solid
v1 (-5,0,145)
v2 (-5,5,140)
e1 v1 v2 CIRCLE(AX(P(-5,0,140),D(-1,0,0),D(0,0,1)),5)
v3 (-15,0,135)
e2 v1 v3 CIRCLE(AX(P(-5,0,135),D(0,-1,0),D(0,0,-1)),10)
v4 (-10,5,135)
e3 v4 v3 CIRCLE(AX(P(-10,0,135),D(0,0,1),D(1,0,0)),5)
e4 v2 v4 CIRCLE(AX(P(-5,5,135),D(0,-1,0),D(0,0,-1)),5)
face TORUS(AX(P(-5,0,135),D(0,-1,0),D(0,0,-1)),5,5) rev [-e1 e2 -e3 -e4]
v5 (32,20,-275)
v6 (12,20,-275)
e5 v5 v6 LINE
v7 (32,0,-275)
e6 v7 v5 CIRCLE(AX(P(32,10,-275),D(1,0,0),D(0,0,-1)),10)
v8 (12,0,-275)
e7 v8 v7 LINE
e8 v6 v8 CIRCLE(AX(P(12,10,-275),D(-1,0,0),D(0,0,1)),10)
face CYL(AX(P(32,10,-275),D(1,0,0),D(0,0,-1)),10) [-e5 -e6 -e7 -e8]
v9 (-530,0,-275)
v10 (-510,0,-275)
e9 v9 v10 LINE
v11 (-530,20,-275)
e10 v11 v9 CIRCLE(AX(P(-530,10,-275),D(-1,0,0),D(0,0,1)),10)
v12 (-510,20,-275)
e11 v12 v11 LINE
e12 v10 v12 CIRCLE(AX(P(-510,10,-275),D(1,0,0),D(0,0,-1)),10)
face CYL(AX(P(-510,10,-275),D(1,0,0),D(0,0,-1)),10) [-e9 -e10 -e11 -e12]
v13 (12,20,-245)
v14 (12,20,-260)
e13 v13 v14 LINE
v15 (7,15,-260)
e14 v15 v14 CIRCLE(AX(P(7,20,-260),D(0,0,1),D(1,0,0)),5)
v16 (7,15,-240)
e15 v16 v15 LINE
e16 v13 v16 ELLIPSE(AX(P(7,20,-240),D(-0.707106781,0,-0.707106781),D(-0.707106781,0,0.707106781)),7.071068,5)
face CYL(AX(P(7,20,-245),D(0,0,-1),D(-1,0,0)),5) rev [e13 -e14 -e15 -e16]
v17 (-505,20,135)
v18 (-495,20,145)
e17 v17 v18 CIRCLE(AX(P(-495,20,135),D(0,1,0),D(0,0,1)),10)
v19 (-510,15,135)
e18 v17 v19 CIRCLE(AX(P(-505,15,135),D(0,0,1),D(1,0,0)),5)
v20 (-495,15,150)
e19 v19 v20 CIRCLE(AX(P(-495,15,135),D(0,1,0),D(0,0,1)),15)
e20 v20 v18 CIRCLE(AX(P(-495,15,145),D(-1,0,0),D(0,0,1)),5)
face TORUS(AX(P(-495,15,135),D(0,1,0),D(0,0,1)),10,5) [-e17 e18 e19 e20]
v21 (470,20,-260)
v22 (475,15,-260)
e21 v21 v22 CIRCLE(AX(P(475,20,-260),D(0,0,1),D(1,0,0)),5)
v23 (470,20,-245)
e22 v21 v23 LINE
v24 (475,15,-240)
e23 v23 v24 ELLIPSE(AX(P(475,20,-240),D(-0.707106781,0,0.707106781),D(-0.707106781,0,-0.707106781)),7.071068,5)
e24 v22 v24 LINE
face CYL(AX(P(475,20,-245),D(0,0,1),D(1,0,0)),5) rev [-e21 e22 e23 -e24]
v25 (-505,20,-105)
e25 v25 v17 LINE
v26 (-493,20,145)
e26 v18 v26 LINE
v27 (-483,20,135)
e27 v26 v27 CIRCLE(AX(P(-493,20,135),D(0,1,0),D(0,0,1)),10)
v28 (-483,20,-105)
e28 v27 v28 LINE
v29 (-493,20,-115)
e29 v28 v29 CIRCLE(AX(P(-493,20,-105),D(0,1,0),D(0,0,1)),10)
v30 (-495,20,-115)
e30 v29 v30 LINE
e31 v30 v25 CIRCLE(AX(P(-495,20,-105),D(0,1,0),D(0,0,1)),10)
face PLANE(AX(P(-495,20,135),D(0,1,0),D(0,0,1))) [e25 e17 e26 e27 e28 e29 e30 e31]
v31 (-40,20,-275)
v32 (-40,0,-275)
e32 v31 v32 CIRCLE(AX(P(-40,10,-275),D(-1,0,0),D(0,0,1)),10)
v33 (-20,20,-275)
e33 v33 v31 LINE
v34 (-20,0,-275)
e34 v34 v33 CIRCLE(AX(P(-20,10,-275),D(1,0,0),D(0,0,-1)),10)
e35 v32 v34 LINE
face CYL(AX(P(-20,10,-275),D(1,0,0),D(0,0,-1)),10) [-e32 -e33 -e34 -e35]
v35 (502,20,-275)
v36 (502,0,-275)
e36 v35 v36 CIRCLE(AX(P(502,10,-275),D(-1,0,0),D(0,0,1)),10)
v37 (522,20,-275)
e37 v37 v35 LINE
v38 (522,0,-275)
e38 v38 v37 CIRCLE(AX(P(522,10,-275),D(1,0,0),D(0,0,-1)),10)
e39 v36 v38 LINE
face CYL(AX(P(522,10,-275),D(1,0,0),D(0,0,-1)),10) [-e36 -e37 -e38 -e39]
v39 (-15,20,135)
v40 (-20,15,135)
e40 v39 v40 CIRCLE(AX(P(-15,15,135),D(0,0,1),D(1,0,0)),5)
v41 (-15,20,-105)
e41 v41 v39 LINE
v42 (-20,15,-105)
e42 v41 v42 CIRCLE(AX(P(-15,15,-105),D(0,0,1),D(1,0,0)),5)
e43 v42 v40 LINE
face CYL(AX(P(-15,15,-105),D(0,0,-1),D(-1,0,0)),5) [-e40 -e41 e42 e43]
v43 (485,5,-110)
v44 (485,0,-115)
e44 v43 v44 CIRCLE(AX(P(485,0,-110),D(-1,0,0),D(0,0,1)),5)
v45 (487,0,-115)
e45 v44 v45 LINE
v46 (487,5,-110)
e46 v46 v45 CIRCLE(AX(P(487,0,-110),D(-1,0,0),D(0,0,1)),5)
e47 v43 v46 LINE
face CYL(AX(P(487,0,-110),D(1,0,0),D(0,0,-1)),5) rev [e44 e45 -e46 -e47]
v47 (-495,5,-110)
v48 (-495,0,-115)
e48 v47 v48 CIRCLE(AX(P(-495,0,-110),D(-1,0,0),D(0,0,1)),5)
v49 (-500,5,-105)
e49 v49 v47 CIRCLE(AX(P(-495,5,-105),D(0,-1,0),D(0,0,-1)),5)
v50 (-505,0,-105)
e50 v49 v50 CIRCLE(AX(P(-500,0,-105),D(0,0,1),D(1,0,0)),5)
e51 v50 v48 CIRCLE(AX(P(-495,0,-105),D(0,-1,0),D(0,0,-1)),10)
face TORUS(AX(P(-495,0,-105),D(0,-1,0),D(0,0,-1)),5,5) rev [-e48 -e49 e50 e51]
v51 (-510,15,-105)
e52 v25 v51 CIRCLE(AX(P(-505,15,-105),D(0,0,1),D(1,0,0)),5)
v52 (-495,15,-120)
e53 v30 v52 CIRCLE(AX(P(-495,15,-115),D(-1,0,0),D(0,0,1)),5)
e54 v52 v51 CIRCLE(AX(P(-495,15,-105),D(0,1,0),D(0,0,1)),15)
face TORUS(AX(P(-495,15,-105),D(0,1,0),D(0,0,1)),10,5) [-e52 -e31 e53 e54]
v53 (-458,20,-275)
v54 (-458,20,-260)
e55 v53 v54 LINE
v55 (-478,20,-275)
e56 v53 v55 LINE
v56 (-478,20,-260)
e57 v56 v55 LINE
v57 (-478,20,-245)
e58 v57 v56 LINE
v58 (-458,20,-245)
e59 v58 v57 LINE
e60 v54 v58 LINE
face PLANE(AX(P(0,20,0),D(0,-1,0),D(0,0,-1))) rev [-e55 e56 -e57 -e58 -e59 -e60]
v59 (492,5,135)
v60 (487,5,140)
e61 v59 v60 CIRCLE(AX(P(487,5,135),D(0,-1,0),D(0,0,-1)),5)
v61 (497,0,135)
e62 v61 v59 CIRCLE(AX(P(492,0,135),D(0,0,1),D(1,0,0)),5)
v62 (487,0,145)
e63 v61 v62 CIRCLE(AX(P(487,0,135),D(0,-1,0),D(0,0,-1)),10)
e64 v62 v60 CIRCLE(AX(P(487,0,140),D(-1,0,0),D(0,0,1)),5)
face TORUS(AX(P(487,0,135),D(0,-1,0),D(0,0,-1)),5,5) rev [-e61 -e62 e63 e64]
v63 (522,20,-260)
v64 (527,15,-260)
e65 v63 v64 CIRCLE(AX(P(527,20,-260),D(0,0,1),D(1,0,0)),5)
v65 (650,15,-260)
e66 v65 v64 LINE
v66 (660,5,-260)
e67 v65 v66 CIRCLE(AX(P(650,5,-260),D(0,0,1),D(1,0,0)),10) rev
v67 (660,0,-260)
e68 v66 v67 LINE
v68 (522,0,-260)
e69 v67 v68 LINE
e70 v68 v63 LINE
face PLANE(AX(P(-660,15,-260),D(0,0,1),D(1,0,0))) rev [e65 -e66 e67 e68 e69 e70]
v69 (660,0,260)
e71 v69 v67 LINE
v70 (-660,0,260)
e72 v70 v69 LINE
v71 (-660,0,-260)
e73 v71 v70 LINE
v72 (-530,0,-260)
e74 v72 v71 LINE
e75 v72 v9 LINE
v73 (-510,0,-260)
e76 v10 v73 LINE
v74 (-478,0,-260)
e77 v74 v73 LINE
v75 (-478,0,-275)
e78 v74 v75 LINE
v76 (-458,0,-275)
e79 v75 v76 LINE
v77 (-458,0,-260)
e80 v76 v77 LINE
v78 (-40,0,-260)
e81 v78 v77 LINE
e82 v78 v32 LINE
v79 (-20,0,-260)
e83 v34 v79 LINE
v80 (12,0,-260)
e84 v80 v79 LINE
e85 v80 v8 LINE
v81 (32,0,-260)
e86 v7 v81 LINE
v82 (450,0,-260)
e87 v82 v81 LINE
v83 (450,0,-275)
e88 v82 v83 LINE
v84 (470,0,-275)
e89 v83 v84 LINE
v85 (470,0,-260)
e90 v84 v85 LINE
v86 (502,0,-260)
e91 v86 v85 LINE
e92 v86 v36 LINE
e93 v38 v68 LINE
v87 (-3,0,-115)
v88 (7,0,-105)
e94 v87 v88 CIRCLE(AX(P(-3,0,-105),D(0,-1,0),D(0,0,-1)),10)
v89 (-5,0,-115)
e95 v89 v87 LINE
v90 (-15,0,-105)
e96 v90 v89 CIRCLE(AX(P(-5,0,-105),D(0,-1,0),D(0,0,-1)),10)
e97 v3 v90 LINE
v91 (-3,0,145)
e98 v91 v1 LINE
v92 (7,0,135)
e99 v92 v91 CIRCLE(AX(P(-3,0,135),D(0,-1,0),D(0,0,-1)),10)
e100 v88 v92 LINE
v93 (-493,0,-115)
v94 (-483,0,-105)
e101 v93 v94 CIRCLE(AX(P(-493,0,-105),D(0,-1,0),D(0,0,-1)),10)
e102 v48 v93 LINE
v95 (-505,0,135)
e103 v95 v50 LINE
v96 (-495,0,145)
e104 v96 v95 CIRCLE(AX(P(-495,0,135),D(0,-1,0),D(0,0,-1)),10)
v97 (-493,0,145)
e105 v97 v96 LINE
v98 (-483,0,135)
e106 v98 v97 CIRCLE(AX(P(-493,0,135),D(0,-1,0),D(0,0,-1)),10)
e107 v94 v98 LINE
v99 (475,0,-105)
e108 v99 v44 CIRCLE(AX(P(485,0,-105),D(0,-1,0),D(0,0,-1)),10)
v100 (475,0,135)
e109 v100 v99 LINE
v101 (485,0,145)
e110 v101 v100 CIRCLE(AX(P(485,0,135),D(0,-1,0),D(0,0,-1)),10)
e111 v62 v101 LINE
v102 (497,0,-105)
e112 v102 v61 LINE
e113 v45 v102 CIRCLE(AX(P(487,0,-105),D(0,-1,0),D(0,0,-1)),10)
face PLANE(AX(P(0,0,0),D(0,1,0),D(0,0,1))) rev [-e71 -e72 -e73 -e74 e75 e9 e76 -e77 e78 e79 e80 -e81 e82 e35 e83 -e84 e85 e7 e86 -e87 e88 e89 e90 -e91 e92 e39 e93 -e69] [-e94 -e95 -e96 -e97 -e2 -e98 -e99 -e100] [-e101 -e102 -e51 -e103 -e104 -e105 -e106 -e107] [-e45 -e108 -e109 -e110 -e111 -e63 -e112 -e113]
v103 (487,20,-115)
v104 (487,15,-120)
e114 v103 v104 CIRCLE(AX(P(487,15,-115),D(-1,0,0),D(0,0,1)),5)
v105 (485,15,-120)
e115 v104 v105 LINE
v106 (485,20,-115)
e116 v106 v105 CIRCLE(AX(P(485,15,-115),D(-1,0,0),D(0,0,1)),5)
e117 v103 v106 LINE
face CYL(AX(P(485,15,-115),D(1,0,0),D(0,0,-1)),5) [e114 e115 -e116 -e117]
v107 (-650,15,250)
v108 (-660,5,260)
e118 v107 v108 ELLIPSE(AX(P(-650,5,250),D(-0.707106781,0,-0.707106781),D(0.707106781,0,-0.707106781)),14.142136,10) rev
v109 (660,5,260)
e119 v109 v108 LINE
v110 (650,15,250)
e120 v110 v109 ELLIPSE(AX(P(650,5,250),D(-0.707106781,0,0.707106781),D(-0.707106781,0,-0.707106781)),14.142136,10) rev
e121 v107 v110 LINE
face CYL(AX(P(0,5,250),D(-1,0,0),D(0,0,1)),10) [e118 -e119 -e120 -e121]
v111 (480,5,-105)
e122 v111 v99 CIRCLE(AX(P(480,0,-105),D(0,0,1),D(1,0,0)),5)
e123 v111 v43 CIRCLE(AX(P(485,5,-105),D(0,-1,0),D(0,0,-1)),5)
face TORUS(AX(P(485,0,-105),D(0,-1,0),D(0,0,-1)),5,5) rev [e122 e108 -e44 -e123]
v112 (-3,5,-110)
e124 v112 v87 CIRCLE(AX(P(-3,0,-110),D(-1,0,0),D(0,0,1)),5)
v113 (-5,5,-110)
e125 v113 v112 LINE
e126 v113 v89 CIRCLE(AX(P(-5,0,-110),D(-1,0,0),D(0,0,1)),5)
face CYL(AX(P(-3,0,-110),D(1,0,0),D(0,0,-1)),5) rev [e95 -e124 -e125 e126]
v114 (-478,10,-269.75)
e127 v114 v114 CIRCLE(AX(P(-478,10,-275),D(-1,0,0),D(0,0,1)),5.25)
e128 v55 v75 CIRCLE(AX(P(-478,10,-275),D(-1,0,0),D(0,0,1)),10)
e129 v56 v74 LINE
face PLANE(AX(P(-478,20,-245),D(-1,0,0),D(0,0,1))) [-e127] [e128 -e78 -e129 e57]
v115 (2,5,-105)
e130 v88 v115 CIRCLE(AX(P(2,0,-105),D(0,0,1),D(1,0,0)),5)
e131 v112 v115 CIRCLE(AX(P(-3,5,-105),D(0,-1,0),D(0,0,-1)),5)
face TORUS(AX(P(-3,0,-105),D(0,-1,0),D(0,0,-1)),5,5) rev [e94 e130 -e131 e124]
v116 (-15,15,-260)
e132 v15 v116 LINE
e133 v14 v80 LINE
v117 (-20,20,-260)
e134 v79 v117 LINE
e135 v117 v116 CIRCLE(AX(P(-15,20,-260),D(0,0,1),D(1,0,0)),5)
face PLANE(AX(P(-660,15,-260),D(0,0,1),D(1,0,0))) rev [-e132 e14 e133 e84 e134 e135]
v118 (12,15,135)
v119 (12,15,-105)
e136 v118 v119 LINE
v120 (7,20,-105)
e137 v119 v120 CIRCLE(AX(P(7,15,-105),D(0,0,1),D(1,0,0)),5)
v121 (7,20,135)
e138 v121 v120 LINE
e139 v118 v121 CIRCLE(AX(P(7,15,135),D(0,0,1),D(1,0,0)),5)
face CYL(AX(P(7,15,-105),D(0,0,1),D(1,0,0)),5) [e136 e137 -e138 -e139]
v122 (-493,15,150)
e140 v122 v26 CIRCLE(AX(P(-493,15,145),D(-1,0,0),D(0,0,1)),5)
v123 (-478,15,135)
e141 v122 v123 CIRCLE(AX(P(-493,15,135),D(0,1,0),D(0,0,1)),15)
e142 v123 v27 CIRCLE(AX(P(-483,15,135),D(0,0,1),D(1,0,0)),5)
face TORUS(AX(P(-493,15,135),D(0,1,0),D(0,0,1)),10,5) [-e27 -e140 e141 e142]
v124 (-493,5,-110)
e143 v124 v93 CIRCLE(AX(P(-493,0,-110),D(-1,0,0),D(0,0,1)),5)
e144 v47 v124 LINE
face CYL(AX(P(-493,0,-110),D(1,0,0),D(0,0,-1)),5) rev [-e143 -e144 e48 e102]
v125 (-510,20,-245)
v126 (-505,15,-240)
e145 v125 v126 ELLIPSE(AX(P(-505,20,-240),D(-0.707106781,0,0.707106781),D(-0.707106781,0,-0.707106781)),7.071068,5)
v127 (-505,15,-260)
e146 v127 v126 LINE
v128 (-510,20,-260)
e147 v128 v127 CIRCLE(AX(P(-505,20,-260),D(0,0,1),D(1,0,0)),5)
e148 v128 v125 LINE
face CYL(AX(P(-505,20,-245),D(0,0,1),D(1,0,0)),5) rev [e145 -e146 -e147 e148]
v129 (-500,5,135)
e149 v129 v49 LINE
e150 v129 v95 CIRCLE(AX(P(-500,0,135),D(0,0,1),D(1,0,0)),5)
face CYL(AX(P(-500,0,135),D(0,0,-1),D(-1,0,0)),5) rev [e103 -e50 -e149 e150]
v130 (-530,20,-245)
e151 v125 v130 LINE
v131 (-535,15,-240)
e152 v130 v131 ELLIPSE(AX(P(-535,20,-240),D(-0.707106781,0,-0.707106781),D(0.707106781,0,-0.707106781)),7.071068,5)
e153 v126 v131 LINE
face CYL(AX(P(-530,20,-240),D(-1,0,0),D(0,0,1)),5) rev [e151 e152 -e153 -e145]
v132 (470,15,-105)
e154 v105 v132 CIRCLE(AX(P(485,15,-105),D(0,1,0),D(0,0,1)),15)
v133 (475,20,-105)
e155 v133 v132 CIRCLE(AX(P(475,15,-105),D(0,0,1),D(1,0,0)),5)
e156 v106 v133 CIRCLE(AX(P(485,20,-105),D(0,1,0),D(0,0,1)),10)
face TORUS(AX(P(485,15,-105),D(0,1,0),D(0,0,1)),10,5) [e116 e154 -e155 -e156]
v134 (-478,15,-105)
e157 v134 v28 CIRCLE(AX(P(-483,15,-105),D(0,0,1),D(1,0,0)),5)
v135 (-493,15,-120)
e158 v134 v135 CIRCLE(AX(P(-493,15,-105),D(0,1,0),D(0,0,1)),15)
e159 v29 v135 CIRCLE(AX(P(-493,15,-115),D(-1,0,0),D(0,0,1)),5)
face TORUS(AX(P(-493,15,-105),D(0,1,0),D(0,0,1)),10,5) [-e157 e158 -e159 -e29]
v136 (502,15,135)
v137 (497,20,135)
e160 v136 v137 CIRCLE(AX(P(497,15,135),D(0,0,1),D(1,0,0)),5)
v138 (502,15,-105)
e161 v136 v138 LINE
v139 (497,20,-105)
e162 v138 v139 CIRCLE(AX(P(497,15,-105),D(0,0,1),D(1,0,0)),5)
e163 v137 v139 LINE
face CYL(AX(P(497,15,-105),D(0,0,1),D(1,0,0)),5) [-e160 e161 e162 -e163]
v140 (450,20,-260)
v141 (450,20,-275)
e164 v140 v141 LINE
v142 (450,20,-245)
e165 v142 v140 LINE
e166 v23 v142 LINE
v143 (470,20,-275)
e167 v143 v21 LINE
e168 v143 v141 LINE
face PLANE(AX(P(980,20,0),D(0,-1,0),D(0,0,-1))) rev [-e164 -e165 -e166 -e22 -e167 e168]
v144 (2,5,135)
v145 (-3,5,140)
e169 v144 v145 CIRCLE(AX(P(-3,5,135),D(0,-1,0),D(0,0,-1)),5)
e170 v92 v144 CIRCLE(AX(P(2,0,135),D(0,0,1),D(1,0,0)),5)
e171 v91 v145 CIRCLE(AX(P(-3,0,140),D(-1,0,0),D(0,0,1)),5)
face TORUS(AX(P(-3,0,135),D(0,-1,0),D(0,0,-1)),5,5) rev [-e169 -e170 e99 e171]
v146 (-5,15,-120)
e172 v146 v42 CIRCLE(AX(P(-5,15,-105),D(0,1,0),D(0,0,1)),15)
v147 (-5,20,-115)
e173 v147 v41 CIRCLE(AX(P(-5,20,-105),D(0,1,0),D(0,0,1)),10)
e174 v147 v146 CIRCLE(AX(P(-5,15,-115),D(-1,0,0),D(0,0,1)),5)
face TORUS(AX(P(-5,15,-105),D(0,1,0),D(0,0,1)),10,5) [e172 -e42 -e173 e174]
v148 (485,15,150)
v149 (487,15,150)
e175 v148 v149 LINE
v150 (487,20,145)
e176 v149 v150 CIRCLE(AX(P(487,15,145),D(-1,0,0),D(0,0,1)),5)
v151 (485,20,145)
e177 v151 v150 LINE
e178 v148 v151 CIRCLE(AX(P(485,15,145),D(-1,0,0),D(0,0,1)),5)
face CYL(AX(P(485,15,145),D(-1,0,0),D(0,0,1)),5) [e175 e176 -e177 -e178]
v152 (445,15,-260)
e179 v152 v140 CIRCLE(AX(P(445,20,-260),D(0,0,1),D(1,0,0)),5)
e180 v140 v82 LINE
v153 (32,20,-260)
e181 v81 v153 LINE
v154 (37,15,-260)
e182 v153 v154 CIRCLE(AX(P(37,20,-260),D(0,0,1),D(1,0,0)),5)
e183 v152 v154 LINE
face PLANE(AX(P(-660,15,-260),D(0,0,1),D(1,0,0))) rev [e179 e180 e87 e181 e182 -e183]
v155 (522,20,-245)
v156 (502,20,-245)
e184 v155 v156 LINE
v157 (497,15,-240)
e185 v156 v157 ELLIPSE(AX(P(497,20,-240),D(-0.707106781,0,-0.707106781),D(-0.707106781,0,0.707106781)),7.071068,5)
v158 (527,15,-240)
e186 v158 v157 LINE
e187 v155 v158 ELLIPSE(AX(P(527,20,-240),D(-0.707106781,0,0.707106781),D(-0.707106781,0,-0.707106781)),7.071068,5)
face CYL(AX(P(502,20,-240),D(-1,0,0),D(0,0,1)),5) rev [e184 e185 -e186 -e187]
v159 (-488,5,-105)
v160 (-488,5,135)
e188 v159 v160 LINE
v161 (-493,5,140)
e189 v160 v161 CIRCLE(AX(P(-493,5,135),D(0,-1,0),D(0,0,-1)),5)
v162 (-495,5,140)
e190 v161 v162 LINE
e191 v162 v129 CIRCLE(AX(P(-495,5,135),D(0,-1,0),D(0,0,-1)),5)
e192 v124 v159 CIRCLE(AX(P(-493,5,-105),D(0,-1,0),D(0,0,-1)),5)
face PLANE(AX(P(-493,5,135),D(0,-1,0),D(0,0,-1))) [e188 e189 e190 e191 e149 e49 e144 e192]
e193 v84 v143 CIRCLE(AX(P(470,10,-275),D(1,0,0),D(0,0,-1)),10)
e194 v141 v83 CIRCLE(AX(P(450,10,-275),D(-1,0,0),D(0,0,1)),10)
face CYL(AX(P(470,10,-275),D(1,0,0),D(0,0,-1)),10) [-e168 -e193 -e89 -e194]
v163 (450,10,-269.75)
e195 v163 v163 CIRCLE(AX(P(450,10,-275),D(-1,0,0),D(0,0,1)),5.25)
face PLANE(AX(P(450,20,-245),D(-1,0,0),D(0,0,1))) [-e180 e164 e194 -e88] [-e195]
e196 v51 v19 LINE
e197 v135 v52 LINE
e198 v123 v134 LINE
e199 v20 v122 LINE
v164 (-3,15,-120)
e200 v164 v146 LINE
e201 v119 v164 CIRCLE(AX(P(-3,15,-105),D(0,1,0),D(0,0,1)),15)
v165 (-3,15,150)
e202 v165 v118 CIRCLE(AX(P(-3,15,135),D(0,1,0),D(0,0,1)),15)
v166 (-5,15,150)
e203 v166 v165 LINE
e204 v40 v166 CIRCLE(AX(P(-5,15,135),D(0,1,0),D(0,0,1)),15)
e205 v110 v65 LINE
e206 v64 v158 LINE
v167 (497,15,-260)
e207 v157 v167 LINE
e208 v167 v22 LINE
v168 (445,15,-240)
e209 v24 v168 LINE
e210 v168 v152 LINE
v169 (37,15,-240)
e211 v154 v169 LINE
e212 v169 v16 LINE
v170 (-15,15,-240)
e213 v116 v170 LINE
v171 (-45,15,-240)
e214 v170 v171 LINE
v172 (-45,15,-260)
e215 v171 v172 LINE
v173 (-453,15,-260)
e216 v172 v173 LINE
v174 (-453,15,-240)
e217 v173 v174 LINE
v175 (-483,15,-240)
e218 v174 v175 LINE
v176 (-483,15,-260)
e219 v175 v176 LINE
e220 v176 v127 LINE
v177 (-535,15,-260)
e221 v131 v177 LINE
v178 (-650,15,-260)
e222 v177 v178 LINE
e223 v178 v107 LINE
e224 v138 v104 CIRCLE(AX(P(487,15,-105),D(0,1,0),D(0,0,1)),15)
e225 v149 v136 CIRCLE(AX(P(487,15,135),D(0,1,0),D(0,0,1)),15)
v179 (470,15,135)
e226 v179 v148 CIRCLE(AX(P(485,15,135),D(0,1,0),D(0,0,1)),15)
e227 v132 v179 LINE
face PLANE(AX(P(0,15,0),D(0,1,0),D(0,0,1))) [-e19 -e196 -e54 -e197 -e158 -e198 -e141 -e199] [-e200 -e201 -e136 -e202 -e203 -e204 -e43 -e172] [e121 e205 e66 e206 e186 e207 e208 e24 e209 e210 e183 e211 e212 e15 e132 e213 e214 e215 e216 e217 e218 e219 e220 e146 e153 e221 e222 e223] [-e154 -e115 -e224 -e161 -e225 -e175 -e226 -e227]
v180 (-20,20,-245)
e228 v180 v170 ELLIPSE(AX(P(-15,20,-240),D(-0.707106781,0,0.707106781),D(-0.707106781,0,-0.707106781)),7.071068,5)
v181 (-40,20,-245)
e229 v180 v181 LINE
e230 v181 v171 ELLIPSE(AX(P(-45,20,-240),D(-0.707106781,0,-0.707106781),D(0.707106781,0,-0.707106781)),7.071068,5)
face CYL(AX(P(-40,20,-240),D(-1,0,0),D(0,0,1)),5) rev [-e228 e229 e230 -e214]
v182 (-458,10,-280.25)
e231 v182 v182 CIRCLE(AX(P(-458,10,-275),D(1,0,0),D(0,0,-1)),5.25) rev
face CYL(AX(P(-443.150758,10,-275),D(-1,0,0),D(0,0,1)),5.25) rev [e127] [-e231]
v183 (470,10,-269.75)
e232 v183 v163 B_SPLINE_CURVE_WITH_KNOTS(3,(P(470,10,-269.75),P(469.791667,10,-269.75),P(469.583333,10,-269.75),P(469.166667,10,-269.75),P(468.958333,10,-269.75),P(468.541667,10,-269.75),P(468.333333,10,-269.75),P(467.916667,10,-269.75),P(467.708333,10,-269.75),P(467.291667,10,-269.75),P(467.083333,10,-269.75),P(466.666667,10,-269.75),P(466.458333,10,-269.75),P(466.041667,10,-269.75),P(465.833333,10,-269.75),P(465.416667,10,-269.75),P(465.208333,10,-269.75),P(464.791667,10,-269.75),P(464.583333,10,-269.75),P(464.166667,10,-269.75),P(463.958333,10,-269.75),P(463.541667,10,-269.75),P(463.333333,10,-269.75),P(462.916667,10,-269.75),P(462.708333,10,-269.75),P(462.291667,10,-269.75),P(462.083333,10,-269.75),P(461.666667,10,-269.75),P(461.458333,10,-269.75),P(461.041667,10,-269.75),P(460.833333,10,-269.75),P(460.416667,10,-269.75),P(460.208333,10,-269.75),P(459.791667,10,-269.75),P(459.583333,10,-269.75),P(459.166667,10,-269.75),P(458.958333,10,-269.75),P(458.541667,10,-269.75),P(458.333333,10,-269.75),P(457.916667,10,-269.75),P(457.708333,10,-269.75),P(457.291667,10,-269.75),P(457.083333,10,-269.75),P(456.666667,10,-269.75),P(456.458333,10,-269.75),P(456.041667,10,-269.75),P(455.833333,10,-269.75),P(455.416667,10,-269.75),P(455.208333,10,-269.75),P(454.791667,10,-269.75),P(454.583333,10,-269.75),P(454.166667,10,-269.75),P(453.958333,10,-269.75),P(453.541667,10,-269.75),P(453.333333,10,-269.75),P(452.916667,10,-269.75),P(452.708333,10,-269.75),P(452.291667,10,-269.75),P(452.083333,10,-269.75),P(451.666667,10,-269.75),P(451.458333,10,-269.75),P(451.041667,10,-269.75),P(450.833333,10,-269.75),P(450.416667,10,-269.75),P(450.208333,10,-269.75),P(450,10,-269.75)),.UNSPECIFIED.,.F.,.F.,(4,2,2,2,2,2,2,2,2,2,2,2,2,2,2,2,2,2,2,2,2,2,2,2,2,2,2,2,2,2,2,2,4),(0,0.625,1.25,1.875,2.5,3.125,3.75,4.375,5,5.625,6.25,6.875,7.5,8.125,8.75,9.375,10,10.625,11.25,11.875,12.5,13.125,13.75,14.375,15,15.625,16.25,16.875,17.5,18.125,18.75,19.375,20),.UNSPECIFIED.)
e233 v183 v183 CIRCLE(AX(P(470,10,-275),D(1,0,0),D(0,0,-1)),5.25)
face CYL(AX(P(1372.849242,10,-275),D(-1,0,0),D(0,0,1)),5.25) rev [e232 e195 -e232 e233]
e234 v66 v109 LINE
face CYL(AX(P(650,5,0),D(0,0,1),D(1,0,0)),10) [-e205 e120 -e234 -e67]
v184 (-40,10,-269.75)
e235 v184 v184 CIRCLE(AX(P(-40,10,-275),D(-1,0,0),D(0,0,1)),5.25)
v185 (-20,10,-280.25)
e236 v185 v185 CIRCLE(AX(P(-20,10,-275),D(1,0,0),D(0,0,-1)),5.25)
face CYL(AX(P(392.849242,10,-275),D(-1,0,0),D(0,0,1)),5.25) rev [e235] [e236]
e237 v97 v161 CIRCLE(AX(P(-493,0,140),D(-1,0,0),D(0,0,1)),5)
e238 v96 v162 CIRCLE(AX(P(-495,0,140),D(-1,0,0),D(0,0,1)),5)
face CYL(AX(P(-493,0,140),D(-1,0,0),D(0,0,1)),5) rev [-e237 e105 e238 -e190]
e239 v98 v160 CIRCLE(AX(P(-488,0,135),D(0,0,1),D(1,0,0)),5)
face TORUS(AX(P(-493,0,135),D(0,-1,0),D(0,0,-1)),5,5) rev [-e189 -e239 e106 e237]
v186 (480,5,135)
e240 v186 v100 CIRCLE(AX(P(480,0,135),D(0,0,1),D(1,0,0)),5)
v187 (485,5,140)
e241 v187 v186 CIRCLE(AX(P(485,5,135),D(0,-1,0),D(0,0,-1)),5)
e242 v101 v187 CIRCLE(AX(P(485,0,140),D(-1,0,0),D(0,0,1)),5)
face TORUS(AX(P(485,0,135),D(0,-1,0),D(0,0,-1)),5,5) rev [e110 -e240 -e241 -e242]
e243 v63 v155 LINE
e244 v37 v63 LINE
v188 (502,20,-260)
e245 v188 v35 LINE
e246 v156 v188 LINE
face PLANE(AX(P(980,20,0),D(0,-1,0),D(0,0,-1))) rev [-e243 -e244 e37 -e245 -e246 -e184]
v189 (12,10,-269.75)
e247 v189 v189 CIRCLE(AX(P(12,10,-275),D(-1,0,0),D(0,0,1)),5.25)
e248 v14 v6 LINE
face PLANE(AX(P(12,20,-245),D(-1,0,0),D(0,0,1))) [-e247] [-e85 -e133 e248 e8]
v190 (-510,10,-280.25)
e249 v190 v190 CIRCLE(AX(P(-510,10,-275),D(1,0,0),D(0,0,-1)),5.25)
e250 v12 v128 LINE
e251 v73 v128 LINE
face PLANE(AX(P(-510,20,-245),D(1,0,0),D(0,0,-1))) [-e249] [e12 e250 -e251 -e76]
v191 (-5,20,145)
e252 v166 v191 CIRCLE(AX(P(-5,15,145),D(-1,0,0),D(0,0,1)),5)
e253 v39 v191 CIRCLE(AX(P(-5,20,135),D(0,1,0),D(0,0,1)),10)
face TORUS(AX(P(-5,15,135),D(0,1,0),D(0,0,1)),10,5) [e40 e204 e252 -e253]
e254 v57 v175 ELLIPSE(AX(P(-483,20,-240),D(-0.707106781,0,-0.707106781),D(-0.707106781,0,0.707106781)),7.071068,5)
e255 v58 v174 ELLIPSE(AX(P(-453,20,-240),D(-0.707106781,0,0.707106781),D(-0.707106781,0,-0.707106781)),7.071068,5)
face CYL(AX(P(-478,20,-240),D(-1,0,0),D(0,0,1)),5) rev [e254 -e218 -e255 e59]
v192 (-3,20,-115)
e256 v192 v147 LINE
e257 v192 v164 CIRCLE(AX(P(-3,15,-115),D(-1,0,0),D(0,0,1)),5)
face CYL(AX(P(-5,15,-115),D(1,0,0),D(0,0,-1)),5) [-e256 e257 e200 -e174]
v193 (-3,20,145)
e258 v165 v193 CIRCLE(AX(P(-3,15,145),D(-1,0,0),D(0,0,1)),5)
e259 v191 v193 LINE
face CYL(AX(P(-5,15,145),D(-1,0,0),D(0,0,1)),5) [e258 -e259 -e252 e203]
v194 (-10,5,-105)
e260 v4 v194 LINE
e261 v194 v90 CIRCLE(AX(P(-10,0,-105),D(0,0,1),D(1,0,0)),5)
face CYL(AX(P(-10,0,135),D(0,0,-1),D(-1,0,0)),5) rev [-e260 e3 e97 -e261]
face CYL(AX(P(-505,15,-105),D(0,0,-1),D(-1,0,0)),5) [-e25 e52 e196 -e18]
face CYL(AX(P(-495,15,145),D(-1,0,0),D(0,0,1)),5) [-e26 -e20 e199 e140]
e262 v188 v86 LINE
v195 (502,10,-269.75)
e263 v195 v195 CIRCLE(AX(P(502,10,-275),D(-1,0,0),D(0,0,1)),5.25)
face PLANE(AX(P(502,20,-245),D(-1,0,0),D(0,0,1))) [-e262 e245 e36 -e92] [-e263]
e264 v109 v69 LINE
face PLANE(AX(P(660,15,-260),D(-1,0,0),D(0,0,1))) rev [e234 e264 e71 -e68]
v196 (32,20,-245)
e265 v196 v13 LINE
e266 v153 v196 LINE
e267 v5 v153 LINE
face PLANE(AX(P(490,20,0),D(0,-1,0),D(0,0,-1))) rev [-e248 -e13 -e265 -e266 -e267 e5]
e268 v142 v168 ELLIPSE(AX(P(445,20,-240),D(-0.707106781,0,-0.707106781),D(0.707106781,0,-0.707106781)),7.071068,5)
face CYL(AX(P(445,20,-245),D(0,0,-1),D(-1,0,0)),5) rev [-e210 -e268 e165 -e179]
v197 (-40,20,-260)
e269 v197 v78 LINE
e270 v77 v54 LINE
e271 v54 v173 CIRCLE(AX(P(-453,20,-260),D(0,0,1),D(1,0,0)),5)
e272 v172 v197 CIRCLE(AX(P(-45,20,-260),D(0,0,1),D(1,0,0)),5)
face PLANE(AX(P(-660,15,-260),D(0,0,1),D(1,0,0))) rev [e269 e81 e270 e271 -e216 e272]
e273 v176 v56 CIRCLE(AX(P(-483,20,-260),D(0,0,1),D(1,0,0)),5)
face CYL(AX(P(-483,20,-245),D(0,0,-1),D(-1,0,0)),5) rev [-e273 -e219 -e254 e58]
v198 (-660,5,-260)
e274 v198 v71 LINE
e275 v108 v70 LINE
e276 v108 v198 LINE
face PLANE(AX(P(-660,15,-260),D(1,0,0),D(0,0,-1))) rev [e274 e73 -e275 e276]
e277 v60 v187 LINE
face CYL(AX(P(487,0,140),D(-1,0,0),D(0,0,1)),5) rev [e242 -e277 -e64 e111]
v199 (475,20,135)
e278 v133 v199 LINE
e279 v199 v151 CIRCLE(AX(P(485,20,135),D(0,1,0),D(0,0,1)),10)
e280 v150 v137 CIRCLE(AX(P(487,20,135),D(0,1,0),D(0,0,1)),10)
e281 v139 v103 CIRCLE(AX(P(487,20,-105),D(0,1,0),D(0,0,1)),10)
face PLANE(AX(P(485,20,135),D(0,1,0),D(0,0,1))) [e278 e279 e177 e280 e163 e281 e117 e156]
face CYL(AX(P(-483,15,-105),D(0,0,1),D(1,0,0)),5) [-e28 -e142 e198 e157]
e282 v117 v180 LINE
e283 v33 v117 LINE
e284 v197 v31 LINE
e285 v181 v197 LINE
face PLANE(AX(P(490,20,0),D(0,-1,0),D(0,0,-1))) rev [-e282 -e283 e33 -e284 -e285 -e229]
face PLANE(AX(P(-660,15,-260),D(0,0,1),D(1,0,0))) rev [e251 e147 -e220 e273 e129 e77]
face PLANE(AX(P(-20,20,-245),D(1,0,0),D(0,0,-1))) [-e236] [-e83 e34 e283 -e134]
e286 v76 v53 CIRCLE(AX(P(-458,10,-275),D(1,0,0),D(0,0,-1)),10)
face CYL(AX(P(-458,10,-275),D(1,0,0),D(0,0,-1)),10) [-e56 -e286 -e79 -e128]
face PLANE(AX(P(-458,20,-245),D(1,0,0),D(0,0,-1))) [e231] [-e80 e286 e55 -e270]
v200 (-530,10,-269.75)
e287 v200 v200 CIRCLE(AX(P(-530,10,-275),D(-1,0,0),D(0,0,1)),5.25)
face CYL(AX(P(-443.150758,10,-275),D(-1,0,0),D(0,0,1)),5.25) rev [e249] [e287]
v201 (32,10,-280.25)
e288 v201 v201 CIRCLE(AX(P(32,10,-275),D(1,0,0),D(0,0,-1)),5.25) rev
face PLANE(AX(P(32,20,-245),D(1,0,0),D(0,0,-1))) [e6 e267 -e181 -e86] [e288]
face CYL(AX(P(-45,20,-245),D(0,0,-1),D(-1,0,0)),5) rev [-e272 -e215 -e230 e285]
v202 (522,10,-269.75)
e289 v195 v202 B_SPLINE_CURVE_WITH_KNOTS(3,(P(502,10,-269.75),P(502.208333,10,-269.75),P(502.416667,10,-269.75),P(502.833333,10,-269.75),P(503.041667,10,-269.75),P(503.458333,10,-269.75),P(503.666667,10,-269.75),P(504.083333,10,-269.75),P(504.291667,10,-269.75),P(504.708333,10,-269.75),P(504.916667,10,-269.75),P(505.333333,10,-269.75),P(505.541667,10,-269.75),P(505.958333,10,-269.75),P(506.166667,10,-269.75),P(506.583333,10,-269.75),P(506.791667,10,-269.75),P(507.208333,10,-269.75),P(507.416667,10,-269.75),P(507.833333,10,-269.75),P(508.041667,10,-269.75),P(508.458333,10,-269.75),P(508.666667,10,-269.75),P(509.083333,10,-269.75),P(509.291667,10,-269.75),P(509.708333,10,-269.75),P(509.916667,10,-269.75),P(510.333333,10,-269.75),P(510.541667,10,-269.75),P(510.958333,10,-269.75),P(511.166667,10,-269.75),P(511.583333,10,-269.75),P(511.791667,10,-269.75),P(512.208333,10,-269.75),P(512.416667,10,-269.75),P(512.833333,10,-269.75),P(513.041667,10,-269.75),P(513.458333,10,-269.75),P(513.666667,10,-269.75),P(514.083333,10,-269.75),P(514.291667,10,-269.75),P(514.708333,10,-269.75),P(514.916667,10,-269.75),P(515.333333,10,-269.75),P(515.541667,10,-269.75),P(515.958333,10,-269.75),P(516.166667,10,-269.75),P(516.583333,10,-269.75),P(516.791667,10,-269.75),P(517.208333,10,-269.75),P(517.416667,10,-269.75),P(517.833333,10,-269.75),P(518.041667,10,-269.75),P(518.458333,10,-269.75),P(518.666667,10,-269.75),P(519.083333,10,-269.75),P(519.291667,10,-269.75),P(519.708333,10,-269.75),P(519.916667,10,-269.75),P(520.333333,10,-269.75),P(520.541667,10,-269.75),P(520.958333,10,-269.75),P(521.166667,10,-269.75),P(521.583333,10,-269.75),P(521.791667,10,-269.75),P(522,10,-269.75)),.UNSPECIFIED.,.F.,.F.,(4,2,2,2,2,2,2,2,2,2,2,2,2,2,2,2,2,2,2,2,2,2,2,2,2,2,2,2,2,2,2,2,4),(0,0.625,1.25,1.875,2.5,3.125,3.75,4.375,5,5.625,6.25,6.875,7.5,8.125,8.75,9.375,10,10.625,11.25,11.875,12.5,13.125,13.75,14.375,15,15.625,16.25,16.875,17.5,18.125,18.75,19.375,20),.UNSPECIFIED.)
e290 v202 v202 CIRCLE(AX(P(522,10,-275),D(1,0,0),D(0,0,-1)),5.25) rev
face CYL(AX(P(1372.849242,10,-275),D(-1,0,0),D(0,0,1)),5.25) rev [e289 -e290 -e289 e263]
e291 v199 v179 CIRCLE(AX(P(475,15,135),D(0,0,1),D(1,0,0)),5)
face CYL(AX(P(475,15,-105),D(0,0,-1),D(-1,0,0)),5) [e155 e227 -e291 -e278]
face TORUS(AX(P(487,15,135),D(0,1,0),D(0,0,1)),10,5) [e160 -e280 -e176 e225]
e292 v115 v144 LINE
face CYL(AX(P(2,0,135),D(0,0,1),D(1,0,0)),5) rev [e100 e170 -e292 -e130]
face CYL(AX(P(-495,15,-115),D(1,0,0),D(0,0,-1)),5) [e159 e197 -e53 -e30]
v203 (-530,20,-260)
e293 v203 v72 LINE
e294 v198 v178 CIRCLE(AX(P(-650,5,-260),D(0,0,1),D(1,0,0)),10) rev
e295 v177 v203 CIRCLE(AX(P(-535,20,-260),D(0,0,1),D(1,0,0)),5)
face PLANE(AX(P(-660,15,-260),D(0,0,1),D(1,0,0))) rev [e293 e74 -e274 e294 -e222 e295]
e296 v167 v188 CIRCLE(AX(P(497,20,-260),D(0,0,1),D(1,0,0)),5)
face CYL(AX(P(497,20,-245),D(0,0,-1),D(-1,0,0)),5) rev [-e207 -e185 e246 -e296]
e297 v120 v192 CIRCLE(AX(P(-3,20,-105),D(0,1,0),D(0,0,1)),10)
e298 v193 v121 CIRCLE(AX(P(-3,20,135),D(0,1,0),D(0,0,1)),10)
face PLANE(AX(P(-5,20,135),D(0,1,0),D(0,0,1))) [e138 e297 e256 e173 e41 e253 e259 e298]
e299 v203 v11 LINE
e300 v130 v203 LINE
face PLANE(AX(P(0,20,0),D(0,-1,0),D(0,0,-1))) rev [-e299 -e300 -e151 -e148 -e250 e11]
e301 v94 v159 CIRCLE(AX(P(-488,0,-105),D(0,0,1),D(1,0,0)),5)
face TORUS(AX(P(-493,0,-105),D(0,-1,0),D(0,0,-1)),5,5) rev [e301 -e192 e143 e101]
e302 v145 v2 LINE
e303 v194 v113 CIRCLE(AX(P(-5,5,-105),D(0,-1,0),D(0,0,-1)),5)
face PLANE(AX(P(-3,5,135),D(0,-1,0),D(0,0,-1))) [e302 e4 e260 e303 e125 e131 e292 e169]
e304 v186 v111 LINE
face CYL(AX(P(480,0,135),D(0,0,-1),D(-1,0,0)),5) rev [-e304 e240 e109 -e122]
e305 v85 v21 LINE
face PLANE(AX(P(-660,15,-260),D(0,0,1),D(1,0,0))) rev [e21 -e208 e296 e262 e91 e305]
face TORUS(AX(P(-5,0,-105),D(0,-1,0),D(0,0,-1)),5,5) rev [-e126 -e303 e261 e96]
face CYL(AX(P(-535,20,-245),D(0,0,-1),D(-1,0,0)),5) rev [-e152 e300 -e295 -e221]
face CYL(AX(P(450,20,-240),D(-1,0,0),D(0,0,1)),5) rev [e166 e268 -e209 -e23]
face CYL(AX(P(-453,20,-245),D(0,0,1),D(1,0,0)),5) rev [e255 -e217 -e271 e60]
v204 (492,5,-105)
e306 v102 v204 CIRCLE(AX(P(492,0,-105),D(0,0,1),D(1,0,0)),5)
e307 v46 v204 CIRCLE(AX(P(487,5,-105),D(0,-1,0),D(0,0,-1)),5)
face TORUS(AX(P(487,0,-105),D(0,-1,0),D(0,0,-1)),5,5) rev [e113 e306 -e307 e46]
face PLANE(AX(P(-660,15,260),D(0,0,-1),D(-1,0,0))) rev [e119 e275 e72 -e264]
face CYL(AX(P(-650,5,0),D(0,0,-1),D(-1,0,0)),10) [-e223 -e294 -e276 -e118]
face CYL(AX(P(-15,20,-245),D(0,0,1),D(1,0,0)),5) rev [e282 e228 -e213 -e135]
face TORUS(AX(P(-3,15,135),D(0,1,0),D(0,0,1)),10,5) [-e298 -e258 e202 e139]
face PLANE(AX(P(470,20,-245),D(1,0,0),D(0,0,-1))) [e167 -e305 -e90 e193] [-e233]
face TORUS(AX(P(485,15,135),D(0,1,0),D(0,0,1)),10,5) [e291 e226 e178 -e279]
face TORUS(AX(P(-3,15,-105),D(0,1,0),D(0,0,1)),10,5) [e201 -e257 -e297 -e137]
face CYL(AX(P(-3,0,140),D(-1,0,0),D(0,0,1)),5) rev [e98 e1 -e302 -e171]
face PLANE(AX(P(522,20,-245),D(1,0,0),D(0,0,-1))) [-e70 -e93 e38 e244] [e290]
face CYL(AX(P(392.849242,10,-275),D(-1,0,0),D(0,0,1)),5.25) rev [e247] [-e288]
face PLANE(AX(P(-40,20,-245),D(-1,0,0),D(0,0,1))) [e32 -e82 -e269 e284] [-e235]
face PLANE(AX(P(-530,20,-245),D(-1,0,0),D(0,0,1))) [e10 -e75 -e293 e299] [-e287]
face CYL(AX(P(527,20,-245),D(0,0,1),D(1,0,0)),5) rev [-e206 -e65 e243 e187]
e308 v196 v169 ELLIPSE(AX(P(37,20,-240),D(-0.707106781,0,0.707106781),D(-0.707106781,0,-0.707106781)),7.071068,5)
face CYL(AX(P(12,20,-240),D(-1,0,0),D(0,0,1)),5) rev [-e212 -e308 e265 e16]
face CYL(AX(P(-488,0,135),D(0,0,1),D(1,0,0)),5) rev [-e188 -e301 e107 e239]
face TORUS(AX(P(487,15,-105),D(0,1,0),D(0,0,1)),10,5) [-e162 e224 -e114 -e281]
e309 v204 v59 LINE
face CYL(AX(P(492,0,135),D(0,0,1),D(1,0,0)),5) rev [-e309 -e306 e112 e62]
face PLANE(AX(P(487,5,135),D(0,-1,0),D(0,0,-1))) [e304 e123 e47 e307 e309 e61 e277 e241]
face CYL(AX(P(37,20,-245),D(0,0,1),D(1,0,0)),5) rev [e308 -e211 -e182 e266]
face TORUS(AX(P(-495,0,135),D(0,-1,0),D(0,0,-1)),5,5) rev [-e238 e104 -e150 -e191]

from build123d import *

# Parameters (mm, degrees)
SZKIC1_W                                = 1320
SZKIC1_H                                = 520
DODANIE_WYCI_GNI_CIE1_DEPTH             = 15
SZKIC3_W                                = 20
SZKIC3_H                                = 40
DODANIE_WYCI_GNI_CIE2_DEPTH             = 20
ZAOKR_GLENIE1_RADIUS                    = 10
ZAOKR_GLENIE1_LENGTH                    = 20
ZAOKR_GLENIE2_RADIUS                    = 10
ZAOKR_GLENIE2_LENGTH                    = 20
WYTNIJ_WYCI_GNI_CIE1_REACH              = 1225.816
SZKIC4_R                                = 5.25
ZAOKR_GLENIE5_R                         = 5
ZAOKR_GLENIE9_R                         = 5
WYTNIJ_WYCI_GNI_CIE2_DEPTH              = 5
SZYK_LINIOWY1_COUNT                     = 3
SZYK_LINIOWY1_PITCH                     = 490
ZAOKR_GLENIE1_OF_SZYK_LINIOWY1_2_RADIUS = 10
ZAOKR_GLENIE1_OF_SZYK_LINIOWY1_2_LENGTH = 20
ZAOKR_GLENIE1_OF_SZYK_LINIOWY1_3_RADIUS = 10
ZAOKR_GLENIE1_OF_SZYK_LINIOWY1_3_LENGTH = 20
ZAOKR_GLENIE2_OF_SZYK_LINIOWY1_2_RADIUS = 10
ZAOKR_GLENIE2_OF_SZYK_LINIOWY1_2_LENGTH = 20
ZAOKR_GLENIE2_OF_SZYK_LINIOWY1_3_RADIUS = 10
ZAOKR_GLENIE2_OF_SZYK_LINIOWY1_3_LENGTH = 20
ZAOKR_GLENIE5_OF_SZYK_LINIOWY1_R        = 5
ZAOKR_GLENIE9_OF_SZYK_LINIOWY1_R        = 5
ZAOKR_GLENIE4_R                         = 10
ZAOKR_GLENIE10_R                        = 5


with BuildPart() as part:
    # Szkic1 → Dodanie-wyciągnięcie1 (new body)
    with BuildSketch(Plane(origin=(0, 0, 0), x_dir=(1, 0, 0), z_dir=(0, 1, 0))):
        Rectangle(SZKIC1_W, SZKIC1_H)
    extrude(amount=DODANIE_WYCI_GNI_CIE1_DEPTH)

    # Szkic3 → Dodanie-wyciągnięcie2 (add)
    with BuildSketch(Plane.XZ):
        with Locations((-520, -265)):
            Rectangle(SZKIC3_W, SZKIC3_H)
        with Locations((-468, -265)):
            Rectangle(SZKIC3_W, SZKIC3_H)
        with BuildLine():
            Line((-495, -120), (-493, -120))
            ThreePointArc((-493, -120), (-482.393398282, -115.606601718), (-478, -105))
            Line((-478, -105), (-478, 135))
            ThreePointArc((-478, 135), (-482.393398282, 145.606601718), (-493, 150))
            Line((-493, 150), (-495, 150))
            ThreePointArc((-495, 150), (-505.606601718, 145.606601718), (-510, 135))
            Line((-510, 135), (-510, -105))
            ThreePointArc((-510, -105), (-505.606601718, -115.606601718), (-495, -120))
        make_face()
    dodanie_wyci_gni_cie2 = extrude(amount=-DODANIE_WYCI_GNI_CIE2_DEPTH)

    # Zaokrąglenie1: full round fillet: the end face becomes a half cylinder, R = half its width
    zaokr_glenie1_face = Plane((-468, 10, -285), x_dir=(-1, 0, 0), z_dir=(0, 0, -1))  # on the end face: x along it, z out of the body
    zaokr_glenie1_slab = zaokr_glenie1_face.offset(-ZAOKR_GLENIE1_RADIUS / 2) * Box(ZAOKR_GLENIE1_LENGTH, 2 * ZAOKR_GLENIE1_RADIUS, ZAOKR_GLENIE1_RADIUS, mode=Mode.PRIVATE)  # the body's end, R deep
    zaokr_glenie1_round = Plane((-468, 10, -275), x_dir=(0, 0, -1), z_dir=(-1, 0, 0)) * Cylinder(ZAOKR_GLENIE1_RADIUS, ZAOKR_GLENIE1_LENGTH, mode=Mode.PRIVATE)  # its axis R under the face
    add(zaokr_glenie1_slab - zaokr_glenie1_round, mode=Mode.SUBTRACT)

    # Zaokrąglenie2: full round fillet: the end face becomes a half cylinder, R = half its width
    zaokr_glenie2_face = Plane((-520, 10, -285), x_dir=(-1, 0, 0), z_dir=(0, 0, -1))  # on the end face: x along it, z out of the body
    zaokr_glenie2_slab = zaokr_glenie2_face.offset(-ZAOKR_GLENIE2_RADIUS / 2) * Box(ZAOKR_GLENIE2_LENGTH, 2 * ZAOKR_GLENIE2_RADIUS, ZAOKR_GLENIE2_RADIUS, mode=Mode.PRIVATE)  # the body's end, R deep
    zaokr_glenie2_round = Plane((-520, 10, -275), x_dir=(0, 0, -1), z_dir=(-1, 0, 0)) * Cylinder(ZAOKR_GLENIE2_RADIUS, ZAOKR_GLENIE2_LENGTH, mode=Mode.PRIVATE)  # its axis R under the face
    add(zaokr_glenie2_slab - zaokr_glenie2_round, mode=Mode.SUBTRACT)

    # Wytnij-wyciągnięcie1: up to this face of the body (flat: up to its plane)
    wytnij_wyci_gni_cie1_end = Plane(part.part.faces().sort_by_distance((-458, 11.057172584, -268.852737199))[0])
    # Szkic4 → Wytnij-wyciągnięcie1 (cut, up to the picked face)
    with BuildSketch(Plane.ZY.offset(530), mode=Mode.PRIVATE) as wytnij_wyci_gni_cie1_sk1:
        with Locations((-275, 10)):
            Circle(SZKIC4_R)
    wytnij_wyci_gni_cie1_tool1 = split(extrude(wytnij_wyci_gni_cie1_sk1.sketch, amount=-WYTNIJ_WYCI_GNI_CIE1_REACH, mode=Mode.PRIVATE), bisect_by=wytnij_wyci_gni_cie1_end, keep=Keep.BOTH, mode=Mode.PRIVATE)
    wytnij_wyci_gni_cie1 = wytnij_wyci_gni_cie1_tool1.solids().sort_by(Axis((-530, 10, -275), (1, 0, 0)))[0]
    add(wytnij_wyci_gni_cie1, mode=Mode.SUBTRACT)

    # Zaokrąglenie5
    zaokr_glenie5_edges = [part.edges().sort_by_distance(p)[0] for p in [
        (-458, 15, -252.5),
        (-478, 15, -252.5),
        (-468, 15, -245),
        (-510, 15, -252.5),
        (-520, 15, -245),
        (-530, 15, -252.5),
    ]]
    fillet(zaokr_glenie5_edges, radius=ZAOKR_GLENIE5_R - 0.0001)  # a hair under: the kernel refuses the full size

    # Zaokrąglenie9
    zaokr_glenie9_edges = [part.edges().sort_by_distance(p)[0] for p in [
        (-505.606601718, 20, 145.606601718),
        (-494, 20, 150),
        (-482.393398282, 20, 145.606601718),
        (-478, 20, 15),
        (-482.393398282, 20, -115.606601718),
        (-494, 20, -120),
        (-505.606601718, 20, -115.606601718),
        (-510, 20, 15),
    ]]
    fillet(zaokr_glenie9_edges, radius=ZAOKR_GLENIE9_R - 0.0001)  # a hair under: the kernel refuses the full size

    # Szkic5 → Wytnij-wyciągnięcie2 (cut)
    with BuildSketch(Plane.XZ):
        with BuildLine():
            Line((-495, 145), (-493, 145))
            ThreePointArc((-493, 145), (-485.928932188, 142.071067812), (-483, 135))
            Line((-483, 135), (-483, -105))
            ThreePointArc((-483, -105), (-485.928932188, -112.071067812), (-493, -115))
            Line((-493, -115), (-495, -115))
            ThreePointArc((-495, -115), (-502.071067812, -112.071067812), (-505, -105))
            Line((-505, -105), (-505, 135))
            ThreePointArc((-505, 135), (-502.071067812, 142.071067812), (-495, 145))
        make_face()
    wytnij_wyci_gni_cie2 = extrude(amount=-WYTNIJ_WYCI_GNI_CIE2_DEPTH, mode=Mode.SUBTRACT)

    # Szyk liniowy1: Dodanie-wyciągnięcie2, Wytnij-wyciągnięcie1, Wytnij-wyciągnięcie2 ×3
    with Locations(*[(i * SZYK_LINIOWY1_PITCH, 0, 0) for i in range(1, SZYK_LINIOWY1_COUNT)]):
        add(dodanie_wyci_gni_cie2)
        add(wytnij_wyci_gni_cie1, mode=Mode.SUBTRACT)
        add(wytnij_wyci_gni_cie2, mode=Mode.SUBTRACT)

    # Zaokrąglenie1 of Szyk liniowy1 2: full round fillet: the end face becomes a half cylinder, R = half its width
    zaokr_glenie1_of_szyk_liniowy1_2_face = Plane((22, 10, -285), x_dir=(-1, 0, 0), z_dir=(0, 0, -1))  # on the end face: x along it, z out of the body
    zaokr_glenie1_of_szyk_liniowy1_2_slab = zaokr_glenie1_of_szyk_liniowy1_2_face.offset(-ZAOKR_GLENIE1_OF_SZYK_LINIOWY1_2_RADIUS / 2) * Box(ZAOKR_GLENIE1_OF_SZYK_LINIOWY1_2_LENGTH, 2 * ZAOKR_GLENIE1_OF_SZYK_LINIOWY1_2_RADIUS, ZAOKR_GLENIE1_OF_SZYK_LINIOWY1_2_RADIUS, mode=Mode.PRIVATE)  # the body's end, R deep
    zaokr_glenie1_of_szyk_liniowy1_2_round = Plane((22, 10, -275), x_dir=(0, 0, -1), z_dir=(-1, 0, 0)) * Cylinder(ZAOKR_GLENIE1_OF_SZYK_LINIOWY1_2_RADIUS, ZAOKR_GLENIE1_OF_SZYK_LINIOWY1_2_LENGTH, mode=Mode.PRIVATE)  # its axis R under the face
    add(zaokr_glenie1_of_szyk_liniowy1_2_slab - zaokr_glenie1_of_szyk_liniowy1_2_round, mode=Mode.SUBTRACT)

    # Zaokrąglenie1 of Szyk liniowy1 3: full round fillet: the end face becomes a half cylinder, R = half its width
    zaokr_glenie1_of_szyk_liniowy1_3_face = Plane((512, 10, -285), x_dir=(-1, 0, 0), z_dir=(0, 0, -1))  # on the end face: x along it, z out of the body
    zaokr_glenie1_of_szyk_liniowy1_3_slab = zaokr_glenie1_of_szyk_liniowy1_3_face.offset(-ZAOKR_GLENIE1_OF_SZYK_LINIOWY1_3_RADIUS / 2) * Box(ZAOKR_GLENIE1_OF_SZYK_LINIOWY1_3_LENGTH, 2 * ZAOKR_GLENIE1_OF_SZYK_LINIOWY1_3_RADIUS, ZAOKR_GLENIE1_OF_SZYK_LINIOWY1_3_RADIUS, mode=Mode.PRIVATE)  # the body's end, R deep
    zaokr_glenie1_of_szyk_liniowy1_3_round = Plane((512, 10, -275), x_dir=(0, 0, -1), z_dir=(-1, 0, 0)) * Cylinder(ZAOKR_GLENIE1_OF_SZYK_LINIOWY1_3_RADIUS, ZAOKR_GLENIE1_OF_SZYK_LINIOWY1_3_LENGTH, mode=Mode.PRIVATE)  # its axis R under the face
    add(zaokr_glenie1_of_szyk_liniowy1_3_slab - zaokr_glenie1_of_szyk_liniowy1_3_round, mode=Mode.SUBTRACT)

    # Zaokrąglenie2 of Szyk liniowy1 2: full round fillet: the end face becomes a half cylinder, R = half its width
    zaokr_glenie2_of_szyk_liniowy1_2_face = Plane((-30, 10, -285), x_dir=(-1, 0, 0), z_dir=(0, 0, -1))  # on the end face: x along it, z out of the body
    zaokr_glenie2_of_szyk_liniowy1_2_slab = zaokr_glenie2_of_szyk_liniowy1_2_face.offset(-ZAOKR_GLENIE2_OF_SZYK_LINIOWY1_2_RADIUS / 2) * Box(ZAOKR_GLENIE2_OF_SZYK_LINIOWY1_2_LENGTH, 2 * ZAOKR_GLENIE2_OF_SZYK_LINIOWY1_2_RADIUS, ZAOKR_GLENIE2_OF_SZYK_LINIOWY1_2_RADIUS, mode=Mode.PRIVATE)  # the body's end, R deep
    zaokr_glenie2_of_szyk_liniowy1_2_round = Plane((-30, 10, -275), x_dir=(0, 0, -1), z_dir=(-1, 0, 0)) * Cylinder(ZAOKR_GLENIE2_OF_SZYK_LINIOWY1_2_RADIUS, ZAOKR_GLENIE2_OF_SZYK_LINIOWY1_2_LENGTH, mode=Mode.PRIVATE)  # its axis R under the face
    add(zaokr_glenie2_of_szyk_liniowy1_2_slab - zaokr_glenie2_of_szyk_liniowy1_2_round, mode=Mode.SUBTRACT)

    # Zaokrąglenie2 of Szyk liniowy1 3: full round fillet: the end face becomes a half cylinder, R = half its width
    zaokr_glenie2_of_szyk_liniowy1_3_face = Plane((460, 10, -285), x_dir=(-1, 0, 0), z_dir=(0, 0, -1))  # on the end face: x along it, z out of the body
    zaokr_glenie2_of_szyk_liniowy1_3_slab = zaokr_glenie2_of_szyk_liniowy1_3_face.offset(-ZAOKR_GLENIE2_OF_SZYK_LINIOWY1_3_RADIUS / 2) * Box(ZAOKR_GLENIE2_OF_SZYK_LINIOWY1_3_LENGTH, 2 * ZAOKR_GLENIE2_OF_SZYK_LINIOWY1_3_RADIUS, ZAOKR_GLENIE2_OF_SZYK_LINIOWY1_3_RADIUS, mode=Mode.PRIVATE)  # the body's end, R deep
    zaokr_glenie2_of_szyk_liniowy1_3_round = Plane((460, 10, -275), x_dir=(0, 0, -1), z_dir=(-1, 0, 0)) * Cylinder(ZAOKR_GLENIE2_OF_SZYK_LINIOWY1_3_RADIUS, ZAOKR_GLENIE2_OF_SZYK_LINIOWY1_3_LENGTH, mode=Mode.PRIVATE)  # its axis R under the face
    add(zaokr_glenie2_of_szyk_liniowy1_3_slab - zaokr_glenie2_of_szyk_liniowy1_3_round, mode=Mode.SUBTRACT)

    # Zaokrąglenie5 of Szyk liniowy1
    zaokr_glenie5_of_szyk_liniowy1_edges = [part.edges().sort_by_distance(p)[0] for p in [
        (32, 15, -252.5),
        (12, 15, -252.5),
        (22, 15, -245),
        (-20, 15, -252.5),
        (-30, 15, -245),
        (-40, 15, -252.5),
        (522, 15, -252.5),
        (502, 15, -252.5),
        (512, 15, -245),
        (470, 15, -252.5),
        (460, 15, -245),
        (450, 15, -252.5),
    ]]
    fillet(zaokr_glenie5_of_szyk_liniowy1_edges, radius=ZAOKR_GLENIE5_OF_SZYK_LINIOWY1_R - 0.0001)  # a hair under: the kernel refuses the full size

    # Zaokrąglenie9 of Szyk liniowy1
    zaokr_glenie9_of_szyk_liniowy1_edges = [part.edges().sort_by_distance(p)[0] for p in [
        (-15.606601718, 20, 145.606601718),
        (-4, 20, 150),
        (7.606601718, 20, 145.606601718),
        (12, 20, 15),
        (7.606601718, 20, -115.606601718),
        (-4, 20, -120),
        (-15.606601718, 20, -115.606601718),
        (-20, 20, 15),
        (474.393398282, 20, 145.606601718),
        (486, 20, 150),
        (497.606601718, 20, 145.606601718),
        (502, 20, 15),
        (497.606601718, 20, -115.606601718),
        (486, 20, -120),
        (474.393398282, 20, -115.606601718),
        (470, 20, 15),
    ]]
    fillet(zaokr_glenie9_of_szyk_liniowy1_edges, radius=ZAOKR_GLENIE9_OF_SZYK_LINIOWY1_R - 0.0001)  # a hair under: the kernel refuses the full size

    # Zaokrąglenie4
    zaokr_glenie4_edges = [part.edges().sort_by_distance(p)[0] for p in [
        (660, 15, 0),
        (-660, 15, 0),
        (0, 15, 260),
    ]]
    fillet(zaokr_glenie4_edges, radius=ZAOKR_GLENIE4_R)

    # Zaokrąglenie10
    zaokr_glenie10_edges = [part.edges().sort_by_distance(p)[0] for p in [
        (494.071067812, 5, -112.071067812),
        (486, 5, -115),
        (477.928932188, 5, -112.071067812),
        (475, 5, 15),
        (477.928932188, 5, 142.071067812),
        (486, 5, 145),
        (494.071067812, 5, 142.071067812),
        (4.071067812, 5, -112.071067812),
        (-4, 5, -115),
        (-12.071067812, 5, -112.071067812),
        (-15, 5, 15),
        (-12.071067812, 5, 142.071067812),
        (-4, 5, 145),
        (4.071067812, 5, 142.071067812),
        (-485.928932188, 5, -112.071067812),
        (-494, 5, -115),
        (-502.071067812, 5, -112.071067812),
        (-505, 5, 15),
        (-502.071067812, 5, 142.071067812),
        (-494, 5, 145),
        (-485.928932188, 5, 142.071067812),
        (497, 5, 15),
        (7, 5, 15),
        (-483, 5, 15),
    ]]
    fillet(zaokr_glenie10_edges, radius=ZAOKR_GLENIE10_R - 0.0001)  # a hair under: the kernel refuses the full size


solid = part.part
